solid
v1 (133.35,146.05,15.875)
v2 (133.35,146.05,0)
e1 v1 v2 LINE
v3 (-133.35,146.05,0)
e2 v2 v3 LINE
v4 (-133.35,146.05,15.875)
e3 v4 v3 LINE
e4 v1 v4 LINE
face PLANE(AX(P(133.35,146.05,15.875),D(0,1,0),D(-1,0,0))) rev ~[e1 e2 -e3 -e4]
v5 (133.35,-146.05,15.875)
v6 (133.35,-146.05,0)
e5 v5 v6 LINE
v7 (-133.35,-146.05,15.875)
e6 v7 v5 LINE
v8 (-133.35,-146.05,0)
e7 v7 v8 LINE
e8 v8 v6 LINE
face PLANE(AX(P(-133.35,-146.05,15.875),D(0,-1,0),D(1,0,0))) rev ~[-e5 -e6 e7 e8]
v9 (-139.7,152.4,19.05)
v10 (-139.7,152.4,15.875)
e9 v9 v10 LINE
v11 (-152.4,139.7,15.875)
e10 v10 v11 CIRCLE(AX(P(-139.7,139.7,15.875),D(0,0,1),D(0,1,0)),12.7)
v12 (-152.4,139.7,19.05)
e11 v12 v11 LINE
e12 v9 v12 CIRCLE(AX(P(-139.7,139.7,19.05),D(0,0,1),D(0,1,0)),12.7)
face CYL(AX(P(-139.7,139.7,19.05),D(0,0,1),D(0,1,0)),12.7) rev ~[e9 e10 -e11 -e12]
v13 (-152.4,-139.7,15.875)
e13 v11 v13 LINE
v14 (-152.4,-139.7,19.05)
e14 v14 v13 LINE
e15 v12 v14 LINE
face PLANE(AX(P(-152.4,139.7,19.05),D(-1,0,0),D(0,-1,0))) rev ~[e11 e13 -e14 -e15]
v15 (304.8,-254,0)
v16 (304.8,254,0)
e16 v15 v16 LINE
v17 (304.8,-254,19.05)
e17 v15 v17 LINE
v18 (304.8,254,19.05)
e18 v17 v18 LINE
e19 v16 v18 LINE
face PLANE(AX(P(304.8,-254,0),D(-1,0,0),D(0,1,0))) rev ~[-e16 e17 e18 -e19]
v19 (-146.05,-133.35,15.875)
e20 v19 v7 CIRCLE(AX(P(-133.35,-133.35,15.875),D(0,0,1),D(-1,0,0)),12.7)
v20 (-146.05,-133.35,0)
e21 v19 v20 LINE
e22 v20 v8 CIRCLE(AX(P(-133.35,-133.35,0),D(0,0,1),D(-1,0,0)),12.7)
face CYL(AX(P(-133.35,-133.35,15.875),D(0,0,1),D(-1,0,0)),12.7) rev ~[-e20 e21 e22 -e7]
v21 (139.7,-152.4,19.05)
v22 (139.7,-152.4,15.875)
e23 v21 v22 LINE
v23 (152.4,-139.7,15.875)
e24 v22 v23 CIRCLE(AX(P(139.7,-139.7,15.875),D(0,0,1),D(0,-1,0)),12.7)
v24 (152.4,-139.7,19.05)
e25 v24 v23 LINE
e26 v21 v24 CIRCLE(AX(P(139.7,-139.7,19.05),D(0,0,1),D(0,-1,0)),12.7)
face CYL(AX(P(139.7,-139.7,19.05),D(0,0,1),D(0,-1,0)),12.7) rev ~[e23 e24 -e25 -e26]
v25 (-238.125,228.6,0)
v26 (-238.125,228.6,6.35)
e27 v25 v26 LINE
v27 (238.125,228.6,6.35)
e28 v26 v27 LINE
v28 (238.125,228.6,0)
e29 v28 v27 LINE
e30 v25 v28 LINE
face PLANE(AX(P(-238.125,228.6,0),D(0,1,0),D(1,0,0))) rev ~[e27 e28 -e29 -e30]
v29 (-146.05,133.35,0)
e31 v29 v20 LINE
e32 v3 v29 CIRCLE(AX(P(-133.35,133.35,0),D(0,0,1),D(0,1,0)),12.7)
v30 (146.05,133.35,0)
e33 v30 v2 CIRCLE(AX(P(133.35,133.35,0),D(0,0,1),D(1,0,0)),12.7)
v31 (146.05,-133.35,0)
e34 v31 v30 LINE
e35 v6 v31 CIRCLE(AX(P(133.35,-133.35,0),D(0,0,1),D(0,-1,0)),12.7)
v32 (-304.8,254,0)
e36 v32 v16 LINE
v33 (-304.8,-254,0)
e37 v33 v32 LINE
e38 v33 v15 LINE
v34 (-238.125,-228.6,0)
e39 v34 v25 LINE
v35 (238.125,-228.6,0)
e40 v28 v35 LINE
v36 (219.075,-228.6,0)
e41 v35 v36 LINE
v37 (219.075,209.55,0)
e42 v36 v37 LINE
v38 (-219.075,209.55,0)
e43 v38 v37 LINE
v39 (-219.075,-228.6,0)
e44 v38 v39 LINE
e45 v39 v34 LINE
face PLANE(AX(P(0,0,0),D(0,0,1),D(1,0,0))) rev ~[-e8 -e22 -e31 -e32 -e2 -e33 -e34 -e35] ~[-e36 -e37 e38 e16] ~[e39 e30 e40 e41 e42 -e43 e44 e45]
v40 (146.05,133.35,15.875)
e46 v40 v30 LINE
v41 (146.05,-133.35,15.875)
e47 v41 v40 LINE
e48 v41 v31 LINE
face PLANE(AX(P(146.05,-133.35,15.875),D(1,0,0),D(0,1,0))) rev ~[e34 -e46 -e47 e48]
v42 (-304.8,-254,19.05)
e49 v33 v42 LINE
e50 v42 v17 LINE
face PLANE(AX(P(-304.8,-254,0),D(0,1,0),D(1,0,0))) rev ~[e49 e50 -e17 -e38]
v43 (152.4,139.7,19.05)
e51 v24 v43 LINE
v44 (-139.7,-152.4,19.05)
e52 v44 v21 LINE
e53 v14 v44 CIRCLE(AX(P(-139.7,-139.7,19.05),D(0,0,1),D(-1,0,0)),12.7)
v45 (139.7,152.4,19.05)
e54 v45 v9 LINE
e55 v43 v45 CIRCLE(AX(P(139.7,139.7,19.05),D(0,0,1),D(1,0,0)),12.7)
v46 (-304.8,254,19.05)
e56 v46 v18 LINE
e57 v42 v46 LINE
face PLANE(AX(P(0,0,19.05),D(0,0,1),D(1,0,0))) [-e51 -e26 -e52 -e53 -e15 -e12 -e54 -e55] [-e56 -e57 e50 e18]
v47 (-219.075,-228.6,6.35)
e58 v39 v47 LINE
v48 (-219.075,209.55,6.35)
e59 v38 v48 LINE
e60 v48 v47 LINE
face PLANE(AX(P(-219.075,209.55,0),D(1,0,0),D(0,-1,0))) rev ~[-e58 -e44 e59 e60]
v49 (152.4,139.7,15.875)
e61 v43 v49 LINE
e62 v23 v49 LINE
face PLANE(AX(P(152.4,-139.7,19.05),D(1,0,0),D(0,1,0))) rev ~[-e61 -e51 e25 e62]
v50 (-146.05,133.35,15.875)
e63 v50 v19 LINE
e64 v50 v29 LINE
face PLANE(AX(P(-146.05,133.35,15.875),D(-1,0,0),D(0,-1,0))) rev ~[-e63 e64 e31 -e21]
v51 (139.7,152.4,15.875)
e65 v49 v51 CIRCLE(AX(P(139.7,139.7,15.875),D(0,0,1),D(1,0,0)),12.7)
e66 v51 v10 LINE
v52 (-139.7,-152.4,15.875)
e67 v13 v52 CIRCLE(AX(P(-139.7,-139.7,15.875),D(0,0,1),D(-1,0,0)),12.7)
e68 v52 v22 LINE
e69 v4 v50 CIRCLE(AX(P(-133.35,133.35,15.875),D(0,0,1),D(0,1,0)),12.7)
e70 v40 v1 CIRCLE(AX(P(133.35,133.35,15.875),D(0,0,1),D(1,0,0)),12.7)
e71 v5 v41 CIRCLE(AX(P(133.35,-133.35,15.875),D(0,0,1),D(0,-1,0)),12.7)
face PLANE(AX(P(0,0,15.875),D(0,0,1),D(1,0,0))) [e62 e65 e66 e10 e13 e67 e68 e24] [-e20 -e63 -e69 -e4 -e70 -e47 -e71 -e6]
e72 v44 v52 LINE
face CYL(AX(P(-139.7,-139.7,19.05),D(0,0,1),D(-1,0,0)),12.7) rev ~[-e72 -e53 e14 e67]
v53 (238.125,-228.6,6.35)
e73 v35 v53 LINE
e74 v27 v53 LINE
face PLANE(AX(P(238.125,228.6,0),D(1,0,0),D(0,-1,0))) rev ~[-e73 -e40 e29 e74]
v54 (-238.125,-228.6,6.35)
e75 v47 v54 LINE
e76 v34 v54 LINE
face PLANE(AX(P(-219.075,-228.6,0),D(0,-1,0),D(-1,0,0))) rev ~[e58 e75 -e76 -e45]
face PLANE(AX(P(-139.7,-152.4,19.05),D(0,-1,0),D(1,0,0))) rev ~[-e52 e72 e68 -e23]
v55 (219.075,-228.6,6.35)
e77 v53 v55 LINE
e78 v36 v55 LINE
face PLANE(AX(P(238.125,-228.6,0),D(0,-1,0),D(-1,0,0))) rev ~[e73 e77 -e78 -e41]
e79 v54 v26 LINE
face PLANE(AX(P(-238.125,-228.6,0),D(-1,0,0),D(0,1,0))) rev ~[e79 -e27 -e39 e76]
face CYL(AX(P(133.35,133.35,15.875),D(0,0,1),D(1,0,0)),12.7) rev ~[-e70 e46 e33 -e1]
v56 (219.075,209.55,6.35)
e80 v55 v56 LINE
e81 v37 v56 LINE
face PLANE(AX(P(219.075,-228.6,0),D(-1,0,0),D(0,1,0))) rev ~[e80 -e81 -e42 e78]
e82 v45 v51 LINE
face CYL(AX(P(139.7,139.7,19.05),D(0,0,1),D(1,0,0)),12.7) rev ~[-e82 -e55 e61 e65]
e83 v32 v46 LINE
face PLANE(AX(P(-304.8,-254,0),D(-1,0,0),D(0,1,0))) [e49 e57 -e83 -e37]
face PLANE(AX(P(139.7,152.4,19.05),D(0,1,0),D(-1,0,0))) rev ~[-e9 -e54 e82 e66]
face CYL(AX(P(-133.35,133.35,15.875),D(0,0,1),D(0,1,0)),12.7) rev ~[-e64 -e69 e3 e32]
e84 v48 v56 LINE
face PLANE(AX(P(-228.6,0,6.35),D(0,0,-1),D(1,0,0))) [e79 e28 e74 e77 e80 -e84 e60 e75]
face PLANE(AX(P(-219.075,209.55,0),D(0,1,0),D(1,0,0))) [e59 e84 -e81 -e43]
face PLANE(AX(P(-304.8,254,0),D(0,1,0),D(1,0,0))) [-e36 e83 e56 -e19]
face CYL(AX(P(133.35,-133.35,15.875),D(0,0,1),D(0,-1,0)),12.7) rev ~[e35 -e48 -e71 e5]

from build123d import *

# Parameters (mm, degrees)
F0_W     = 609.6
F0_H     = 508
F1_DEPTH = 19.05
F3_DEPTH = 3.175
F5_DEPTH = 19.05
F6_W     = 438.15
F6_H     = 19.05
F7_DEPTH = 6.35


# Not quite as in the source:
# - a length typed as a fraction of an inch, garbled in the dataset ("3 / 203.2 mm" for 3/8 in), is restored


with BuildPart() as f1:
    # F0 (on Top) → F1 (new body)
    with BuildSketch(Plane.XY):
        Rectangle(F0_W, F0_H)
    extrude(amount=F1_DEPTH)

    # F2 (on face) → F3 (cut)
    with BuildSketch(Plane.XY.offset(19.05)):
        with BuildLine():
            ThreePointArc((152.4, 139.7), (148.6802561211, 148.6802561211), (139.7, 152.4))
            Line((139.7, 152.4), (-139.7, 152.4))
            ThreePointArc((-139.7, 152.4), (-148.6802561211, 148.6802561211), (-152.4, 139.7))
            Line((-152.4, 139.7), (-152.4, -139.7))
            ThreePointArc((-152.4, -139.7), (-148.6802561211, -148.6802561211), (-139.7, -152.4))
            Line((-139.7, -152.4), (139.7, -152.4))
            ThreePointArc((139.7, -152.4), (148.6802561211, -148.6802561211), (152.4, -139.7))
            Line((152.4, -139.7), (152.4, 139.7))
        make_face()
    extrude(amount=-F3_DEPTH, mode=Mode.SUBTRACT)

    # F4 (on face) → F5 (cut)
    with BuildSketch(Plane.XY.offset(15.875)):
        with BuildLine():
            ThreePointArc((146.05, 133.35), (142.3302561211, 142.3302561211), (133.35, 146.05))
            Line((133.35, 146.05), (-133.35, 146.05))
            ThreePointArc((-133.35, 146.05), (-142.3302561211, 142.3302561211), (-146.05, 133.35))
            Line((-146.05, 133.35), (-146.05, -133.35))
            ThreePointArc((-146.05, -133.35), (-142.3302561211, -142.3302561211), (-133.35, -146.05))
            Line((-133.35, -146.05), (133.35, -146.05))
            ThreePointArc((133.35, -146.05), (142.3302561211, -142.3302561211), (146.05, -133.35))
            Line((146.05, -133.35), (146.05, 133.35))
        make_face()
    extrude(amount=-F5_DEPTH, mode=Mode.SUBTRACT)

    # F6 (on face) → F7 (cut)
    with BuildSketch(Plane(origin=(0, 0, 0), x_dir=(1, 0, 0), z_dir=(0, 0, -1))):
        Polygon((-219.075, 228.6), (-238.125, 228.6), (-238.125, -228.6), (-219.075, -228.6), (-219.075, -209.55), align=None)
        with Locations((0, -219.075)):
            Rectangle(F6_W, F6_H)
        Polygon((219.075, 228.6), (219.075, -209.55), (219.075, -228.6), (238.125, -228.6), (238.125, 228.6), align=None)
    extrude(amount=-F7_DEPTH, mode=Mode.SUBTRACT)


solid = f1.part
